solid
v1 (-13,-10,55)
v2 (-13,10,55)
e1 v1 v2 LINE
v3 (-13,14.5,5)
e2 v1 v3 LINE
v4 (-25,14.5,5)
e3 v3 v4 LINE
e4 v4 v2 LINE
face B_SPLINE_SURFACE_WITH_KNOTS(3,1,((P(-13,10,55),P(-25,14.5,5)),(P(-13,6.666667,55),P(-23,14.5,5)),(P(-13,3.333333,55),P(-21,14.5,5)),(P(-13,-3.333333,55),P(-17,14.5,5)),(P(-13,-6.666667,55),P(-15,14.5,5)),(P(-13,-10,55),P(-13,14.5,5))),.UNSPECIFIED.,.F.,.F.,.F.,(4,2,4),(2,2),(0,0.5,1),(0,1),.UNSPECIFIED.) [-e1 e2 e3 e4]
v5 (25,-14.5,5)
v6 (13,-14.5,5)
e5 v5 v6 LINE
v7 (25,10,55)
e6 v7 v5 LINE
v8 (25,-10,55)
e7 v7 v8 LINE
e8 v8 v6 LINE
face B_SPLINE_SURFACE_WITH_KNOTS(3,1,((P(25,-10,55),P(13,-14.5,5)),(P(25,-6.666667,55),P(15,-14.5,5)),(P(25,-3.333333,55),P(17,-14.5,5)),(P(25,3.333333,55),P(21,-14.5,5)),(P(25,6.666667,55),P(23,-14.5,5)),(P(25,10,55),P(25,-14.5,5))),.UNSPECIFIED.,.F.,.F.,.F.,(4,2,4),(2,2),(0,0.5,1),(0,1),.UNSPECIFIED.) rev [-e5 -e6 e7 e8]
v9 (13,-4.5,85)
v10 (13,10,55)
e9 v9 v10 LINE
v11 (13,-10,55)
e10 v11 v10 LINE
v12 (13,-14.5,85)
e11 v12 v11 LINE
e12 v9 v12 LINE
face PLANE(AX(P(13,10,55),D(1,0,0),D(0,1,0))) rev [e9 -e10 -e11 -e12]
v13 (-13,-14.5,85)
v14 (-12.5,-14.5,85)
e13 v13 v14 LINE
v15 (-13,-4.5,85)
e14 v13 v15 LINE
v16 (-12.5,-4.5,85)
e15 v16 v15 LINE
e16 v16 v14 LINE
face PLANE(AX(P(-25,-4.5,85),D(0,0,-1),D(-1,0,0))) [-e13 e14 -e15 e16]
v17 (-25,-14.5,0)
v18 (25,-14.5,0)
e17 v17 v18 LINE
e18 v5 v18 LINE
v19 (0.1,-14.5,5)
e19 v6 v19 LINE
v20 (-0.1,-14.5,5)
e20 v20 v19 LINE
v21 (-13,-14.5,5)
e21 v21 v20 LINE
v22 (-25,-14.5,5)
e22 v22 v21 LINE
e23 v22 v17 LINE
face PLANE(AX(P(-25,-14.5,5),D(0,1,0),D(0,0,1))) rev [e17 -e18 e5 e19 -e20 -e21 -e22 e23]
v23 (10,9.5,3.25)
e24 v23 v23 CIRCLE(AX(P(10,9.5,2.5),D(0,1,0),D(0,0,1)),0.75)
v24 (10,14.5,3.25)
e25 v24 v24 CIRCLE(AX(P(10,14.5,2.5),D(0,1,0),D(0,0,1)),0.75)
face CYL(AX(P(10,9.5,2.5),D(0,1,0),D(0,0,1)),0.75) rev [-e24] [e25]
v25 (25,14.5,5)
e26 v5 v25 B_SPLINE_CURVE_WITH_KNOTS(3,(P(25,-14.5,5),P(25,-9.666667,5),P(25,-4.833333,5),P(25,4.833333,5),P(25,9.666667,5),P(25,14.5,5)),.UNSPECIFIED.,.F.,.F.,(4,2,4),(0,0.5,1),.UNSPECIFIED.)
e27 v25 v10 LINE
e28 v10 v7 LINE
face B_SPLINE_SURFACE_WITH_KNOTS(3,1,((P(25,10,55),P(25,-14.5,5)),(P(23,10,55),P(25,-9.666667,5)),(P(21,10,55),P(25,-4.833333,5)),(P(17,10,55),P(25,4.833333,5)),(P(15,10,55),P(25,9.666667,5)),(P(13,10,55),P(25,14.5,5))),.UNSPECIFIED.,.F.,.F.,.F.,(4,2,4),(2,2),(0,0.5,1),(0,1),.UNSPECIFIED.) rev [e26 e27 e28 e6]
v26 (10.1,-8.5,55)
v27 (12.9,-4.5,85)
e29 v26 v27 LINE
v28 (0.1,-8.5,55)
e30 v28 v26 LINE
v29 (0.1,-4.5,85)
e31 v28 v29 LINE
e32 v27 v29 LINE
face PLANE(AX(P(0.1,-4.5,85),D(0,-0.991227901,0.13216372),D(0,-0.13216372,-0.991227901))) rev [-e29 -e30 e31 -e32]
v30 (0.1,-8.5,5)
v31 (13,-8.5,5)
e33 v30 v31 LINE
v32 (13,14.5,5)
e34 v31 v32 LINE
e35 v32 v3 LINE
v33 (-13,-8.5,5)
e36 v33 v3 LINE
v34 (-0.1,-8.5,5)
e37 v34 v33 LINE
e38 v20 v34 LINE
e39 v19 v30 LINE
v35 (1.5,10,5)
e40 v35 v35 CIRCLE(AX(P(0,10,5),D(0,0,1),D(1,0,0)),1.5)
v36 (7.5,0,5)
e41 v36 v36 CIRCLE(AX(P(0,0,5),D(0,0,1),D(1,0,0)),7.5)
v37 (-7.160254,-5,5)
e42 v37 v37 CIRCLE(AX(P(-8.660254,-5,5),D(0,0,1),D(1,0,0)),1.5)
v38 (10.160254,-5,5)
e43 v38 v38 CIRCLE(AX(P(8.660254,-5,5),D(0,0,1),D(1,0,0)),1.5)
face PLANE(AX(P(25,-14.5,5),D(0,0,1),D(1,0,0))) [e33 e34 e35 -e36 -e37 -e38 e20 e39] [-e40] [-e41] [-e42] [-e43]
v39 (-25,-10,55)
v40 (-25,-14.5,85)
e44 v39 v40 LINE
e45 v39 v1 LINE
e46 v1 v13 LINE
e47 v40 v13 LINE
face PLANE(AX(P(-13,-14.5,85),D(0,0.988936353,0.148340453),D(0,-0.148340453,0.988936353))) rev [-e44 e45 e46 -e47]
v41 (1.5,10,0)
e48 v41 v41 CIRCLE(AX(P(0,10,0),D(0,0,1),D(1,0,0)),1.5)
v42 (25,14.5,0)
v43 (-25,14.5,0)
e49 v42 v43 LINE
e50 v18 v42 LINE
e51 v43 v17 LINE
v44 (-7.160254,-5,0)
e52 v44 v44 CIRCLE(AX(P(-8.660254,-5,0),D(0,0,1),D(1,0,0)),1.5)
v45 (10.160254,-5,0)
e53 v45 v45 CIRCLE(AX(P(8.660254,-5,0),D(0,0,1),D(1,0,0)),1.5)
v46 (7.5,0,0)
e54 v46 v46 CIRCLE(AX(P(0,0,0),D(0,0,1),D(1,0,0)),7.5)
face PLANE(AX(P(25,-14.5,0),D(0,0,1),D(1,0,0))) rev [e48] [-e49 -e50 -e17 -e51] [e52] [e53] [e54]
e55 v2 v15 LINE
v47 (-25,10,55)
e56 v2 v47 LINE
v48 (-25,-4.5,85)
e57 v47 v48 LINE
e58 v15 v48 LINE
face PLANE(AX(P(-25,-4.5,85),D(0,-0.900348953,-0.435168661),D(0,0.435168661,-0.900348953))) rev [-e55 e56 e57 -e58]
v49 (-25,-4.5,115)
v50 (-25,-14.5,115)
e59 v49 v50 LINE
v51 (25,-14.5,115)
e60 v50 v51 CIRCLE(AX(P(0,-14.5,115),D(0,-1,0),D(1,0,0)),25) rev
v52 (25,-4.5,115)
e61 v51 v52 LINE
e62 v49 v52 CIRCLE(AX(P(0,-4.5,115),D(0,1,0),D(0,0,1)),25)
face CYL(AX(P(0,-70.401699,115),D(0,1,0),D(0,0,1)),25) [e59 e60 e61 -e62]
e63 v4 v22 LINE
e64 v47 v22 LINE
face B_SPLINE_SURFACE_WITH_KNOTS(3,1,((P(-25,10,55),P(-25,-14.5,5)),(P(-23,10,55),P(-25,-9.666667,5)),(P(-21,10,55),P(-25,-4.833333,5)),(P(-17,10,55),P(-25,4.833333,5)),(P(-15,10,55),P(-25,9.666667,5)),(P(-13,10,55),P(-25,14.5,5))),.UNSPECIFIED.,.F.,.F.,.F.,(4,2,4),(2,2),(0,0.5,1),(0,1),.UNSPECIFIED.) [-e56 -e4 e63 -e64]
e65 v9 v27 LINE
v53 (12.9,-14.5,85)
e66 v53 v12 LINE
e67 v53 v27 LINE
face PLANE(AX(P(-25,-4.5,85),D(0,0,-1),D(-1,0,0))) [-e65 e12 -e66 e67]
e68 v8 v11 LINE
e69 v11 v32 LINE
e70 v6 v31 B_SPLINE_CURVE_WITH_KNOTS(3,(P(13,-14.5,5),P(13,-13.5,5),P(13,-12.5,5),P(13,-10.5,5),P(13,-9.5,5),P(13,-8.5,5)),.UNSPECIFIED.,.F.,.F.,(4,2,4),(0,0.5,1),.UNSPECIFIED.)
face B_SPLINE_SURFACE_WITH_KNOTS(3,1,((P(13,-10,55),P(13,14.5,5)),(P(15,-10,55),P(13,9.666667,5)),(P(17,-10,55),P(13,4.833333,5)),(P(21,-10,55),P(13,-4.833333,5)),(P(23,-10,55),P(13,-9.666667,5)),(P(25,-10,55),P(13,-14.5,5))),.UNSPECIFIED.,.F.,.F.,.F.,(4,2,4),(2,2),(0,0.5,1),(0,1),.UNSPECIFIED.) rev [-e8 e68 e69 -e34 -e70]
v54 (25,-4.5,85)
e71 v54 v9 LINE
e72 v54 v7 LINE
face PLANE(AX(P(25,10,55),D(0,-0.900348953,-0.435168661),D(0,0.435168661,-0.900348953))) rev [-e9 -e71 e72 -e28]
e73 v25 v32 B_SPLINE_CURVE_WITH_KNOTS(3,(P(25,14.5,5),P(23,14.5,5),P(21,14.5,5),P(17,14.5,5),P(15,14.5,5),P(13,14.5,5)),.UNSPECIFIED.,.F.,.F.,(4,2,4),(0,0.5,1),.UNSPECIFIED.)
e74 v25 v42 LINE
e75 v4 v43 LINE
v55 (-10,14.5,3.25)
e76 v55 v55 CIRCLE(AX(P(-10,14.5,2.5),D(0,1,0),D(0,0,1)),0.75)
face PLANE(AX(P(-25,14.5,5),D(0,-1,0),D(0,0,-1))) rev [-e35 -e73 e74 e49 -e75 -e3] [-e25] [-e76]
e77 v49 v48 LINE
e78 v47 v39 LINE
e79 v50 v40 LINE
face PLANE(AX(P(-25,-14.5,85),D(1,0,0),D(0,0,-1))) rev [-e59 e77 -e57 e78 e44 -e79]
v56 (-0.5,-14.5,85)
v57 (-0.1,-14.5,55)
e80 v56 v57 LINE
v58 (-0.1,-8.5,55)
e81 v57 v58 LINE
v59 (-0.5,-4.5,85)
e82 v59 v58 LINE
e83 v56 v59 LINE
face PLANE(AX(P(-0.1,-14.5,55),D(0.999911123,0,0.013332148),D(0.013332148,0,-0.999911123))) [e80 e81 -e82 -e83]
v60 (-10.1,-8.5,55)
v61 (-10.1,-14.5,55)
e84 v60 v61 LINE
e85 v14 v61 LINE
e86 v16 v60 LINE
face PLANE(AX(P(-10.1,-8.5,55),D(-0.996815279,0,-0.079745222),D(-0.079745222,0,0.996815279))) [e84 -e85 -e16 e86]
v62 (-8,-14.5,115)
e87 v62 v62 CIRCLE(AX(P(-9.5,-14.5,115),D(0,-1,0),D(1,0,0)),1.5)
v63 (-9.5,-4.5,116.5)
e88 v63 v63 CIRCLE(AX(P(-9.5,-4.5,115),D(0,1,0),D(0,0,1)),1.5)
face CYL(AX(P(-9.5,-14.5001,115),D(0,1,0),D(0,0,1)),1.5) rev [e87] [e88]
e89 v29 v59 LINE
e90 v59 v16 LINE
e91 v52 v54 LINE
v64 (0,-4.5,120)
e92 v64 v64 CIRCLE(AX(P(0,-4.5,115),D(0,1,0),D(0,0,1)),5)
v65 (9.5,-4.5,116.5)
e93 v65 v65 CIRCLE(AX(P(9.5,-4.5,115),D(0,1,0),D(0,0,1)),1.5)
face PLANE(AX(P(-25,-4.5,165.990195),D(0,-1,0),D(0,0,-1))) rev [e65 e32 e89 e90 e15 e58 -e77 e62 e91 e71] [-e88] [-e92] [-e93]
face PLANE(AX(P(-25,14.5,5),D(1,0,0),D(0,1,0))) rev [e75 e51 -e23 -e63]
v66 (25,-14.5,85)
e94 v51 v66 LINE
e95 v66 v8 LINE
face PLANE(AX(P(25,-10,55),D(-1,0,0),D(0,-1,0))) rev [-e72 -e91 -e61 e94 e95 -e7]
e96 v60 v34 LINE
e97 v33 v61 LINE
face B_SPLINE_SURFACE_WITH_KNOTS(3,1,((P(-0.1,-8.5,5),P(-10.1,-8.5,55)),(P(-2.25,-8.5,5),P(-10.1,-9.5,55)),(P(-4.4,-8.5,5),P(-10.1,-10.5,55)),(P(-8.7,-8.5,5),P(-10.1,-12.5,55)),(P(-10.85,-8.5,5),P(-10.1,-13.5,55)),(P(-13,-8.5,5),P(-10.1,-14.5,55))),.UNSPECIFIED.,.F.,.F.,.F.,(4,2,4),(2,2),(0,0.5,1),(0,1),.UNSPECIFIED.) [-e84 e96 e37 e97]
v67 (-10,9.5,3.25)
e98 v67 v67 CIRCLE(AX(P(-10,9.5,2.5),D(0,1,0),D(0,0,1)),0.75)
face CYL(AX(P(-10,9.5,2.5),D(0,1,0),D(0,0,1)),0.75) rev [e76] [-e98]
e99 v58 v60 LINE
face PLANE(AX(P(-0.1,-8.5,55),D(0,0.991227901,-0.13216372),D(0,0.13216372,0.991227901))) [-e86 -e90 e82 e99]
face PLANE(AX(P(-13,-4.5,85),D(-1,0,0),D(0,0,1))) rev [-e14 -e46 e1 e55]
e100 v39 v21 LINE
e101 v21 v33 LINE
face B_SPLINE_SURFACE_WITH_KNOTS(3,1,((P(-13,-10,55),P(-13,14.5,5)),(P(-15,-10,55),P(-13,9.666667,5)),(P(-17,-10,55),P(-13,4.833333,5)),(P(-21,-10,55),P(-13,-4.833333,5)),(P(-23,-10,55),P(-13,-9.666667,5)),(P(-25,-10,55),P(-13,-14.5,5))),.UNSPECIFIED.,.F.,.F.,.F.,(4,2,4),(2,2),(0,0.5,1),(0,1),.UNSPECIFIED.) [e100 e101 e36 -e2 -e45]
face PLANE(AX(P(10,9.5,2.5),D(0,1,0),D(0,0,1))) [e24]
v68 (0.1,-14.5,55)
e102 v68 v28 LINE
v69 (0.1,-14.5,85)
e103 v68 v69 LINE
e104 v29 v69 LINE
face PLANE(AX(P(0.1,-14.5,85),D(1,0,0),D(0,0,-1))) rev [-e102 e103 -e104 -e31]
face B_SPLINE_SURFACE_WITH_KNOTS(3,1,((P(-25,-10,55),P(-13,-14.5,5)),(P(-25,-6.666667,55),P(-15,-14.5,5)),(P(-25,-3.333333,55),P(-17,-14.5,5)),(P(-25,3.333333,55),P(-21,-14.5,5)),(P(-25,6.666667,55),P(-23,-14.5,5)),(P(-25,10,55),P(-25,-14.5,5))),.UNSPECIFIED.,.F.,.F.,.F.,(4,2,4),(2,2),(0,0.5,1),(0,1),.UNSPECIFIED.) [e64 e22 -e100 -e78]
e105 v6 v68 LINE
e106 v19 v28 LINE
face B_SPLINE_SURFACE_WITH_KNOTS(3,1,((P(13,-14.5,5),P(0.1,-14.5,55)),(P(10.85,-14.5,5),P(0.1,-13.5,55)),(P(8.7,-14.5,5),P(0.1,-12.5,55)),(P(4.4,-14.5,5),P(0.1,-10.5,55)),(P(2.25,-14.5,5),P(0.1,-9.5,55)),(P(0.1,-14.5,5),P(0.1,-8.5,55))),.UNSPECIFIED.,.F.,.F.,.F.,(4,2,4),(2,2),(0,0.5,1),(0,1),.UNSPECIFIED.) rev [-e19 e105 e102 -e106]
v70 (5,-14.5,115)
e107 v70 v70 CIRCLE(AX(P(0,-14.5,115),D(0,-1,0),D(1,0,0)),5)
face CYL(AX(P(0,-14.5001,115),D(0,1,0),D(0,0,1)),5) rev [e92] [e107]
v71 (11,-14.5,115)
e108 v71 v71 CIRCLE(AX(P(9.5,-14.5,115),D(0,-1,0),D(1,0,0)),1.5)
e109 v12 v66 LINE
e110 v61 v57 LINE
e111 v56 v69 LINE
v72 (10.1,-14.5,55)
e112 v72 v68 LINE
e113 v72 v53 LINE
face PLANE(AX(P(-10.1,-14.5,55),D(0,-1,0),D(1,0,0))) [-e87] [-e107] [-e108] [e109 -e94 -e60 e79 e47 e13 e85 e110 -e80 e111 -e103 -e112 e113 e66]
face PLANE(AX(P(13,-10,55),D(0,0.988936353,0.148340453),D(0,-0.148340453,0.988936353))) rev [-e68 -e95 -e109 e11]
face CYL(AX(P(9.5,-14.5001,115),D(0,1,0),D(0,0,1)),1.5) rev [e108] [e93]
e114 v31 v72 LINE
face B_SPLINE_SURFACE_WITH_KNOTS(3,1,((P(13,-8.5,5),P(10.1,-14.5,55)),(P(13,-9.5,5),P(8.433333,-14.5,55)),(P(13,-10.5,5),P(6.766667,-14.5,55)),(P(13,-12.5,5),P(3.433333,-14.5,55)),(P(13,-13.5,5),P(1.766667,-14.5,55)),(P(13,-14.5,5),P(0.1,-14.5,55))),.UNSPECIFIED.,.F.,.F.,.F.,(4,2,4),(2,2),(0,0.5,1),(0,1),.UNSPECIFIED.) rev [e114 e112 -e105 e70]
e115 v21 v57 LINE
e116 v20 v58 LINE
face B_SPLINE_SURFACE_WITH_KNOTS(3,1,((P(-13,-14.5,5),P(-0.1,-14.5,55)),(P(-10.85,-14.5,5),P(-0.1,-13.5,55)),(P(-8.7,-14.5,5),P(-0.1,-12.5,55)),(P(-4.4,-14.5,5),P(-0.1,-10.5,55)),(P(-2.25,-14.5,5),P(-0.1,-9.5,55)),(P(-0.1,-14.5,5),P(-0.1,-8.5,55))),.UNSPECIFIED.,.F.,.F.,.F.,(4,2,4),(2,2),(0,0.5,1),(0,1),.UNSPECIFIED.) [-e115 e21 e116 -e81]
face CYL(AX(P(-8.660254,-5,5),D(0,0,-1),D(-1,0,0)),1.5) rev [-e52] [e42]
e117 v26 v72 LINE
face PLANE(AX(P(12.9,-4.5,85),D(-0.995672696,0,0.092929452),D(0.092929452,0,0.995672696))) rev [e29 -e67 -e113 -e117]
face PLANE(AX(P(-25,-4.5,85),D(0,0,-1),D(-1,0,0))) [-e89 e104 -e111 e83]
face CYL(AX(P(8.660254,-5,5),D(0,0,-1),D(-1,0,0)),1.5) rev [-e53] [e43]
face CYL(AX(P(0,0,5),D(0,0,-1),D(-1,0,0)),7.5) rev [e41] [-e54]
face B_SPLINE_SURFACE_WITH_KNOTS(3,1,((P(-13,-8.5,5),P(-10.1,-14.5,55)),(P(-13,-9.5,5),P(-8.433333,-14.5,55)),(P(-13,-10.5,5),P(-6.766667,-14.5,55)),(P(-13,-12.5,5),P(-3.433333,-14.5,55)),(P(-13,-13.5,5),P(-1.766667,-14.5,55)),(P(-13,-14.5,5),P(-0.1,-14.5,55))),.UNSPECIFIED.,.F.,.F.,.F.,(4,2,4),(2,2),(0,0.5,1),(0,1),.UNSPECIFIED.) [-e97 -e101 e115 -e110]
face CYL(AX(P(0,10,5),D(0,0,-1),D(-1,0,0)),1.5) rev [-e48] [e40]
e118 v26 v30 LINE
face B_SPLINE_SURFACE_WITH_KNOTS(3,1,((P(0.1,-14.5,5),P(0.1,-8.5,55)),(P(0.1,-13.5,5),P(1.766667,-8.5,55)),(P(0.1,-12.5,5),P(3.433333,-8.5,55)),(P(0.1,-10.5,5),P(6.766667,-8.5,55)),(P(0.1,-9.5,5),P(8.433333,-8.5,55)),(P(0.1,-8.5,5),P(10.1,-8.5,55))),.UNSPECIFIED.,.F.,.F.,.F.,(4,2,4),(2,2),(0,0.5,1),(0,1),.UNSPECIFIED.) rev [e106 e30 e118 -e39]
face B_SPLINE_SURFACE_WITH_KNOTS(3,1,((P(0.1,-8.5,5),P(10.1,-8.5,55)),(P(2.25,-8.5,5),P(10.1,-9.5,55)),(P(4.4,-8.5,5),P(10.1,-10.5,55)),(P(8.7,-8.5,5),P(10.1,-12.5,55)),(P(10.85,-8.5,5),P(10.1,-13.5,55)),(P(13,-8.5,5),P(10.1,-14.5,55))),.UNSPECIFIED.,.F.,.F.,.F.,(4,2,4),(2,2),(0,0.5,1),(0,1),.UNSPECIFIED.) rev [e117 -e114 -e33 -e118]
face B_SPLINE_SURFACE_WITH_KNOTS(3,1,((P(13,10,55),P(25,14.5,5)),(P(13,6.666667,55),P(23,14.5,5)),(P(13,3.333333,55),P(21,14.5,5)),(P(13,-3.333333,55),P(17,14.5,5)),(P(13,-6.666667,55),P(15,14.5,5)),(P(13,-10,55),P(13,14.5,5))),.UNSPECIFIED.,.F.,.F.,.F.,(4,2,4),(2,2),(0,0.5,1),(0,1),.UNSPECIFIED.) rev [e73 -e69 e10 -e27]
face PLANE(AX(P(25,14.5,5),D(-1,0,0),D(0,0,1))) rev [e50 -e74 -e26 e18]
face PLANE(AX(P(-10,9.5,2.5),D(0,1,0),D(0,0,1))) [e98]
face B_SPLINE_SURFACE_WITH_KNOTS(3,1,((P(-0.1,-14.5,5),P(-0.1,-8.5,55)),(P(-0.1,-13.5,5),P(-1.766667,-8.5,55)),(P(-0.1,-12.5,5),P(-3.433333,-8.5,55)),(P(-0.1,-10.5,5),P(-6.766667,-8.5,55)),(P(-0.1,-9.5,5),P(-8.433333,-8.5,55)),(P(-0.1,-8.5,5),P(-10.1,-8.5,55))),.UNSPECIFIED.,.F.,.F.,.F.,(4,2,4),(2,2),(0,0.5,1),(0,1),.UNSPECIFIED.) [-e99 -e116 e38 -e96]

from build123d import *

# Parameters (mm, degrees)
SKETCH_1_W          = 50
SKETCH_1_H          = 29
SKETCH_1_R          = 1.5
SKETCH_1_R_2        = 7.5
EXTRUDE_1_DEPTH     = 5
SKETCH_22_W         = 50
SKETCH_22_H         = 10
EXTRUDE_2_DEPTH     = 30
EXTRUDE_3_DEPTH     = 10
SKETCH_25_R         = 5
SKETCH_25_R_2       = 1.5
CUT_EXTRUDE_1_DEPTH = 144.478221472
SKETCH_26_R         = 0.75
CUT_EXTRUDE_2_DEPTH = 5


with BuildPart() as part:
    # 草圖1 → 填料-伸長1 (new body)
    with BuildSketch(Plane.XY):
        Rectangle(SKETCH_1_W, SKETCH_1_H)
        with Locations((0, 10)):
            Circle(SKETCH_1_R, mode=Mode.SUBTRACT)
        with Locations((-8.660254038, -5)):
            Circle(SKETCH_1_R, mode=Mode.SUBTRACT)
        with Locations((8.660254038, -5)):
            Circle(SKETCH_1_R, mode=Mode.SUBTRACT)
        Circle(SKETCH_1_R_2, mode=Mode.SUBTRACT)
    extrude(amount=EXTRUDE_1_DEPTH)

    # 疊層拉伸2: read off the stored shape, not the designer's step
    # 疊層拉伸2: loft between two sections, ruled curve by curve
    loft_2_from = [
        Edge.make_bspline([(-13, 10, 55), (-13, 6.666666667, 55), (-13, 3.333333333, 55), (-13, -3.333333333, 55), (-13, -6.666666667, 55), (-13, -10, 55)], [0, 0, 0, 0, 0.5, 0.5, 1, 1, 1, 1], 3),
        Edge.make_bspline([(-13, -10, 55), (-15, -10, 55), (-17, -10, 55), (-21, -10, 55), (-23, -10, 55), (-25, -10, 55)], [0, 0, 0, 0, 0.5, 0.5, 1, 1, 1, 1], 3),
        Edge.make_bspline([(-25, 10, 55), (-23, 10, 55), (-21, 10, 55), (-17, 10, 55), (-15, 10, 55), (-13, 10, 55)], [0, 0, 0, 0, 0.5, 0.5, 1, 1, 1, 1], 3),
        Edge.make_bspline([(-25, -10, 55), (-25, -6.666666667, 55), (-25, -3.333333333, 55), (-25, 3.333333333, 55), (-25, 6.666666667, 55), (-25, 10, 55)], [0, 0, 0, 0, 0.5, 0.5, 1, 1, 1, 1], 3),
    ]
    loft_2_to = [
        Edge.make_bspline([(-25, 14.5, 5), (-23, 14.5, 5), (-21, 14.5, 5), (-17, 14.5, 5), (-15, 14.5, 5), (-13, 14.5, 5)], [0, 0, 0, 0, 0.5, 0.5, 1, 1, 1, 1], 3),
        Edge.make_bspline([(-13, 14.5, 5), (-13, 9.666666667, 5), (-13, 4.833333333, 5), (-13, -4.833333333, 5), (-13, -9.666666667, 5), (-13, -14.5, 5)], [0, 0, 0, 0, 0.5, 0.5, 1, 1, 1, 1], 3),
        Edge.make_bspline([(-25, -14.5, 5), (-25, -9.666666667, 5), (-25, -4.833333333, 5), (-25, 4.833333333, 5), (-25, 9.666666667, 5), (-25, 14.5, 5)], [0, 0, 0, 0, 0.5, 0.5, 1, 1, 1, 1], 3),
        Edge.make_bspline([(-13, -14.5, 5), (-15, -14.5, 5), (-17, -14.5, 5), (-21, -14.5, 5), (-23, -14.5, 5), (-25, -14.5, 5)], [0, 0, 0, 0, 0.5, 0.5, 1, 1, 1, 1], 3),
    ]
    loft_2 = Solid(Shell([*[Face.make_surface_from_curves(loft_2_from[k], loft_2_to[k]) for k in range(4)], Face(Wire(loft_2_from)), Face(Wire(loft_2_to))]))
    add(loft_2)

    # 疊層拉伸7: read off the stored shape, not the designer's step
    # 疊層拉伸7: loft between two sections, ruled curve by curve
    loft_7_from = [
        Edge.make_bspline([(-0.1, -8.5, 5), (-2.25, -8.5, 5), (-4.4, -8.5, 5), (-8.7, -8.5, 5), (-10.85, -8.5, 5), (-13, -8.5, 5)], [0, 0, 0, 0, 0.5, 0.5, 1, 1, 1, 1], 3),
        Edge.make_bspline([(-13, -8.5, 5), (-13, -9.5, 5), (-13, -10.5, 5), (-13, -12.5, 5), (-13, -13.5, 5), (-13, -14.5, 5)], [0, 0, 0, 0, 0.5, 0.5, 1, 1, 1, 1], 3),
        Edge.make_bspline([(-0.1, -14.5, 5), (-0.1, -13.5, 5), (-0.1, -12.5, 5), (-0.1, -10.5, 5), (-0.1, -9.5, 5), (-0.1, -8.5, 5)], [0, 0, 0, 0, 0.5, 0.5, 1, 1, 1, 1], 3),
        Edge.make_bspline([(-13, -14.5, 5), (-10.85, -14.5, 5), (-8.7, -14.5, 5), (-4.4, -14.5, 5), (-2.25, -14.5, 5), (-0.1, -14.5, 5)], [0, 0, 0, 0, 0.5, 0.5, 1, 1, 1, 1], 3),
    ]
    loft_7_to = [
        Edge.make_bspline([(-10.1, -8.5, 55), (-10.1, -9.5, 55), (-10.1, -10.5, 55), (-10.1, -12.5, 55), (-10.1, -13.5, 55), (-10.1, -14.5, 55)], [0, 0, 0, 0, 0.5, 0.5, 1, 1, 1, 1], 3),
        Edge.make_bspline([(-10.1, -14.5, 55), (-8.433333333, -14.5, 55), (-6.766666667, -14.5, 55), (-3.433333333, -14.5, 55), (-1.766666667, -14.5, 55), (-0.1, -14.5, 55)], [0, 0, 0, 0, 0.5, 0.5, 1, 1, 1, 1], 3),
        Edge.make_bspline([(-0.1, -8.5, 55), (-1.766666667, -8.5, 55), (-3.433333333, -8.5, 55), (-6.766666667, -8.5, 55), (-8.433333333, -8.5, 55), (-10.1, -8.5, 55)], [0, 0, 0, 0, 0.5, 0.5, 1, 1, 1, 1], 3),
        Edge.make_bspline([(-0.1, -14.5, 55), (-0.1, -13.5, 55), (-0.1, -12.5, 55), (-0.1, -10.5, 55), (-0.1, -9.5, 55), (-0.1, -8.5, 55)], [0, 0, 0, 0, 0.5, 0.5, 1, 1, 1, 1], 3),
    ]
    loft_7 = Solid(Shell([*[Face.make_surface_from_curves(loft_7_from[k], loft_7_to[k]) for k in range(4)], Face(Wire(loft_7_from)), Face(Wire(loft_7_to))]))
    add(loft_7)

    # 草圖17 → section 1 of loft_13
    with BuildSketch(Plane.XY.offset(85), mode=Mode.PRIVATE) as loft_13_s1:
        with BuildLine():
            Line((-25, -14.5), (-13, -14.5))
            Line((-13, -14.5), (-13, -4.5))
            Line((-13, -4.5), (-25, -4.5))
            Line((-25, -4.5), (-25, -14.5))
        make_face()
    # loft from a face of the part (loft_13)
    loft([part.faces().sort_by_distance((-19, 0, 55))[0], loft_13_s1.sketch])

    # 草圖19 → section 0 of loft_14
    with BuildSketch(Plane.XY.offset(85), mode=Mode.PRIVATE) as loft_14_s0:
        with BuildLine():
            Line((-12.5, -14.5), (-0.5, -14.5))
            Line((-0.5, -14.5), (-0.5, -4.5))
            Line((-0.5, -4.5), (-12.5, -4.5))
            Line((-12.5, -4.5), (-12.5, -14.5))
        make_face()
    # loft up to a face of the part (loft_14)
    loft([loft_14_s0.sketch, part.faces().sort_by_distance((-5.1, -11.5, 55))[0]])

    # 鏡射5: 疊層拉伸2, 疊層拉伸7 across plane
    add(loft_2.mirror(Plane.ZY))
    add(loft_7.mirror(Plane.ZY))

    # 草圖20 → section 0 of loft_15
    with BuildSketch(Plane.XY.offset(85), mode=Mode.PRIVATE) as loft_15_s0:
        with BuildLine():
            Line((25, -4.5), (13, -4.5))
            Line((13, -4.5), (13, -14.5))
            Line((13, -14.5), (25, -14.5))
            Line((25, -14.5), (25, -4.5))
        make_face()
    # loft up to a face of the part (loft_15)
    loft([loft_15_s0.sketch, part.faces().sort_by_distance((19, 0, 55))[0]])

    # 草圖21 → section 1 of loft_16
    with BuildSketch(Plane.XY.offset(85), mode=Mode.PRIVATE) as loft_16_s1:
        with BuildLine():
            Line((0.1, -14.5), (12.9, -14.5))
            Line((12.9, -14.5), (12.9, -4.5))
            Line((12.9, -4.5), (0.1, -4.5))
            Line((0.1, -4.5), (0.1, -14.5))
        make_face()
    # loft from a face of the part (loft_16)
    loft([part.faces().sort_by_distance((5.1, -11.5, 55))[0], loft_16_s1.sketch])

    # 草圖22 → 填料-伸長2 (add)
    with BuildSketch(Plane.XY.offset(85)):
        with Locations((0, -9.5)):
            Rectangle(SKETCH_22_W, SKETCH_22_H)
    extrude(amount=EXTRUDE_2_DEPTH)

    # 草圖23 → 填料-伸長3 (add)
    with BuildSketch(Plane(origin=(0, -4.5, 0), x_dir=(1, 0, 0), z_dir=(0, 1, 0))):
        with BuildLine():
            Line((-25, -115), (25, -115))
            ThreePointArc((25, -115), (0, -140), (-25, -115))
        make_face()
    extrude(amount=-EXTRUDE_3_DEPTH)

    # 草圖25 → 除料-伸長1 (cut, through all)
    with BuildSketch(Plane(origin=(0, -4.5, 0), x_dir=(1, 0, 0), z_dir=(0, 1, 0))):
        with Locations(Location((0, -115, 0), (0, 0, 270))):
            Circle(SKETCH_25_R)
        with Locations(Location((9.5, -115, 0), (0, 0, 270))):
            Circle(SKETCH_25_R_2)
        with Locations(Location((-9.5, -115, 0), (0, 0, 270))):
            Circle(SKETCH_25_R_2)
    extrude(amount=-CUT_EXTRUDE_1_DEPTH, mode=Mode.SUBTRACT)

    # 草圖26 → 除料-伸長2 (cut)
    with BuildSketch(Plane(origin=(0, 14.5, 0), x_dir=(1, 0, 0), z_dir=(0, 1, 0))):
        with Locations(Location((-10, -2.5, 0), (0, 0, 270))):
            Circle(SKETCH_26_R)
        with Locations(Location((10, -2.5, 0), (0, 0, 270))):
            Circle(SKETCH_26_R)
    extrude(amount=-CUT_EXTRUDE_2_DEPTH, mode=Mode.SUBTRACT)


solid = part.part
